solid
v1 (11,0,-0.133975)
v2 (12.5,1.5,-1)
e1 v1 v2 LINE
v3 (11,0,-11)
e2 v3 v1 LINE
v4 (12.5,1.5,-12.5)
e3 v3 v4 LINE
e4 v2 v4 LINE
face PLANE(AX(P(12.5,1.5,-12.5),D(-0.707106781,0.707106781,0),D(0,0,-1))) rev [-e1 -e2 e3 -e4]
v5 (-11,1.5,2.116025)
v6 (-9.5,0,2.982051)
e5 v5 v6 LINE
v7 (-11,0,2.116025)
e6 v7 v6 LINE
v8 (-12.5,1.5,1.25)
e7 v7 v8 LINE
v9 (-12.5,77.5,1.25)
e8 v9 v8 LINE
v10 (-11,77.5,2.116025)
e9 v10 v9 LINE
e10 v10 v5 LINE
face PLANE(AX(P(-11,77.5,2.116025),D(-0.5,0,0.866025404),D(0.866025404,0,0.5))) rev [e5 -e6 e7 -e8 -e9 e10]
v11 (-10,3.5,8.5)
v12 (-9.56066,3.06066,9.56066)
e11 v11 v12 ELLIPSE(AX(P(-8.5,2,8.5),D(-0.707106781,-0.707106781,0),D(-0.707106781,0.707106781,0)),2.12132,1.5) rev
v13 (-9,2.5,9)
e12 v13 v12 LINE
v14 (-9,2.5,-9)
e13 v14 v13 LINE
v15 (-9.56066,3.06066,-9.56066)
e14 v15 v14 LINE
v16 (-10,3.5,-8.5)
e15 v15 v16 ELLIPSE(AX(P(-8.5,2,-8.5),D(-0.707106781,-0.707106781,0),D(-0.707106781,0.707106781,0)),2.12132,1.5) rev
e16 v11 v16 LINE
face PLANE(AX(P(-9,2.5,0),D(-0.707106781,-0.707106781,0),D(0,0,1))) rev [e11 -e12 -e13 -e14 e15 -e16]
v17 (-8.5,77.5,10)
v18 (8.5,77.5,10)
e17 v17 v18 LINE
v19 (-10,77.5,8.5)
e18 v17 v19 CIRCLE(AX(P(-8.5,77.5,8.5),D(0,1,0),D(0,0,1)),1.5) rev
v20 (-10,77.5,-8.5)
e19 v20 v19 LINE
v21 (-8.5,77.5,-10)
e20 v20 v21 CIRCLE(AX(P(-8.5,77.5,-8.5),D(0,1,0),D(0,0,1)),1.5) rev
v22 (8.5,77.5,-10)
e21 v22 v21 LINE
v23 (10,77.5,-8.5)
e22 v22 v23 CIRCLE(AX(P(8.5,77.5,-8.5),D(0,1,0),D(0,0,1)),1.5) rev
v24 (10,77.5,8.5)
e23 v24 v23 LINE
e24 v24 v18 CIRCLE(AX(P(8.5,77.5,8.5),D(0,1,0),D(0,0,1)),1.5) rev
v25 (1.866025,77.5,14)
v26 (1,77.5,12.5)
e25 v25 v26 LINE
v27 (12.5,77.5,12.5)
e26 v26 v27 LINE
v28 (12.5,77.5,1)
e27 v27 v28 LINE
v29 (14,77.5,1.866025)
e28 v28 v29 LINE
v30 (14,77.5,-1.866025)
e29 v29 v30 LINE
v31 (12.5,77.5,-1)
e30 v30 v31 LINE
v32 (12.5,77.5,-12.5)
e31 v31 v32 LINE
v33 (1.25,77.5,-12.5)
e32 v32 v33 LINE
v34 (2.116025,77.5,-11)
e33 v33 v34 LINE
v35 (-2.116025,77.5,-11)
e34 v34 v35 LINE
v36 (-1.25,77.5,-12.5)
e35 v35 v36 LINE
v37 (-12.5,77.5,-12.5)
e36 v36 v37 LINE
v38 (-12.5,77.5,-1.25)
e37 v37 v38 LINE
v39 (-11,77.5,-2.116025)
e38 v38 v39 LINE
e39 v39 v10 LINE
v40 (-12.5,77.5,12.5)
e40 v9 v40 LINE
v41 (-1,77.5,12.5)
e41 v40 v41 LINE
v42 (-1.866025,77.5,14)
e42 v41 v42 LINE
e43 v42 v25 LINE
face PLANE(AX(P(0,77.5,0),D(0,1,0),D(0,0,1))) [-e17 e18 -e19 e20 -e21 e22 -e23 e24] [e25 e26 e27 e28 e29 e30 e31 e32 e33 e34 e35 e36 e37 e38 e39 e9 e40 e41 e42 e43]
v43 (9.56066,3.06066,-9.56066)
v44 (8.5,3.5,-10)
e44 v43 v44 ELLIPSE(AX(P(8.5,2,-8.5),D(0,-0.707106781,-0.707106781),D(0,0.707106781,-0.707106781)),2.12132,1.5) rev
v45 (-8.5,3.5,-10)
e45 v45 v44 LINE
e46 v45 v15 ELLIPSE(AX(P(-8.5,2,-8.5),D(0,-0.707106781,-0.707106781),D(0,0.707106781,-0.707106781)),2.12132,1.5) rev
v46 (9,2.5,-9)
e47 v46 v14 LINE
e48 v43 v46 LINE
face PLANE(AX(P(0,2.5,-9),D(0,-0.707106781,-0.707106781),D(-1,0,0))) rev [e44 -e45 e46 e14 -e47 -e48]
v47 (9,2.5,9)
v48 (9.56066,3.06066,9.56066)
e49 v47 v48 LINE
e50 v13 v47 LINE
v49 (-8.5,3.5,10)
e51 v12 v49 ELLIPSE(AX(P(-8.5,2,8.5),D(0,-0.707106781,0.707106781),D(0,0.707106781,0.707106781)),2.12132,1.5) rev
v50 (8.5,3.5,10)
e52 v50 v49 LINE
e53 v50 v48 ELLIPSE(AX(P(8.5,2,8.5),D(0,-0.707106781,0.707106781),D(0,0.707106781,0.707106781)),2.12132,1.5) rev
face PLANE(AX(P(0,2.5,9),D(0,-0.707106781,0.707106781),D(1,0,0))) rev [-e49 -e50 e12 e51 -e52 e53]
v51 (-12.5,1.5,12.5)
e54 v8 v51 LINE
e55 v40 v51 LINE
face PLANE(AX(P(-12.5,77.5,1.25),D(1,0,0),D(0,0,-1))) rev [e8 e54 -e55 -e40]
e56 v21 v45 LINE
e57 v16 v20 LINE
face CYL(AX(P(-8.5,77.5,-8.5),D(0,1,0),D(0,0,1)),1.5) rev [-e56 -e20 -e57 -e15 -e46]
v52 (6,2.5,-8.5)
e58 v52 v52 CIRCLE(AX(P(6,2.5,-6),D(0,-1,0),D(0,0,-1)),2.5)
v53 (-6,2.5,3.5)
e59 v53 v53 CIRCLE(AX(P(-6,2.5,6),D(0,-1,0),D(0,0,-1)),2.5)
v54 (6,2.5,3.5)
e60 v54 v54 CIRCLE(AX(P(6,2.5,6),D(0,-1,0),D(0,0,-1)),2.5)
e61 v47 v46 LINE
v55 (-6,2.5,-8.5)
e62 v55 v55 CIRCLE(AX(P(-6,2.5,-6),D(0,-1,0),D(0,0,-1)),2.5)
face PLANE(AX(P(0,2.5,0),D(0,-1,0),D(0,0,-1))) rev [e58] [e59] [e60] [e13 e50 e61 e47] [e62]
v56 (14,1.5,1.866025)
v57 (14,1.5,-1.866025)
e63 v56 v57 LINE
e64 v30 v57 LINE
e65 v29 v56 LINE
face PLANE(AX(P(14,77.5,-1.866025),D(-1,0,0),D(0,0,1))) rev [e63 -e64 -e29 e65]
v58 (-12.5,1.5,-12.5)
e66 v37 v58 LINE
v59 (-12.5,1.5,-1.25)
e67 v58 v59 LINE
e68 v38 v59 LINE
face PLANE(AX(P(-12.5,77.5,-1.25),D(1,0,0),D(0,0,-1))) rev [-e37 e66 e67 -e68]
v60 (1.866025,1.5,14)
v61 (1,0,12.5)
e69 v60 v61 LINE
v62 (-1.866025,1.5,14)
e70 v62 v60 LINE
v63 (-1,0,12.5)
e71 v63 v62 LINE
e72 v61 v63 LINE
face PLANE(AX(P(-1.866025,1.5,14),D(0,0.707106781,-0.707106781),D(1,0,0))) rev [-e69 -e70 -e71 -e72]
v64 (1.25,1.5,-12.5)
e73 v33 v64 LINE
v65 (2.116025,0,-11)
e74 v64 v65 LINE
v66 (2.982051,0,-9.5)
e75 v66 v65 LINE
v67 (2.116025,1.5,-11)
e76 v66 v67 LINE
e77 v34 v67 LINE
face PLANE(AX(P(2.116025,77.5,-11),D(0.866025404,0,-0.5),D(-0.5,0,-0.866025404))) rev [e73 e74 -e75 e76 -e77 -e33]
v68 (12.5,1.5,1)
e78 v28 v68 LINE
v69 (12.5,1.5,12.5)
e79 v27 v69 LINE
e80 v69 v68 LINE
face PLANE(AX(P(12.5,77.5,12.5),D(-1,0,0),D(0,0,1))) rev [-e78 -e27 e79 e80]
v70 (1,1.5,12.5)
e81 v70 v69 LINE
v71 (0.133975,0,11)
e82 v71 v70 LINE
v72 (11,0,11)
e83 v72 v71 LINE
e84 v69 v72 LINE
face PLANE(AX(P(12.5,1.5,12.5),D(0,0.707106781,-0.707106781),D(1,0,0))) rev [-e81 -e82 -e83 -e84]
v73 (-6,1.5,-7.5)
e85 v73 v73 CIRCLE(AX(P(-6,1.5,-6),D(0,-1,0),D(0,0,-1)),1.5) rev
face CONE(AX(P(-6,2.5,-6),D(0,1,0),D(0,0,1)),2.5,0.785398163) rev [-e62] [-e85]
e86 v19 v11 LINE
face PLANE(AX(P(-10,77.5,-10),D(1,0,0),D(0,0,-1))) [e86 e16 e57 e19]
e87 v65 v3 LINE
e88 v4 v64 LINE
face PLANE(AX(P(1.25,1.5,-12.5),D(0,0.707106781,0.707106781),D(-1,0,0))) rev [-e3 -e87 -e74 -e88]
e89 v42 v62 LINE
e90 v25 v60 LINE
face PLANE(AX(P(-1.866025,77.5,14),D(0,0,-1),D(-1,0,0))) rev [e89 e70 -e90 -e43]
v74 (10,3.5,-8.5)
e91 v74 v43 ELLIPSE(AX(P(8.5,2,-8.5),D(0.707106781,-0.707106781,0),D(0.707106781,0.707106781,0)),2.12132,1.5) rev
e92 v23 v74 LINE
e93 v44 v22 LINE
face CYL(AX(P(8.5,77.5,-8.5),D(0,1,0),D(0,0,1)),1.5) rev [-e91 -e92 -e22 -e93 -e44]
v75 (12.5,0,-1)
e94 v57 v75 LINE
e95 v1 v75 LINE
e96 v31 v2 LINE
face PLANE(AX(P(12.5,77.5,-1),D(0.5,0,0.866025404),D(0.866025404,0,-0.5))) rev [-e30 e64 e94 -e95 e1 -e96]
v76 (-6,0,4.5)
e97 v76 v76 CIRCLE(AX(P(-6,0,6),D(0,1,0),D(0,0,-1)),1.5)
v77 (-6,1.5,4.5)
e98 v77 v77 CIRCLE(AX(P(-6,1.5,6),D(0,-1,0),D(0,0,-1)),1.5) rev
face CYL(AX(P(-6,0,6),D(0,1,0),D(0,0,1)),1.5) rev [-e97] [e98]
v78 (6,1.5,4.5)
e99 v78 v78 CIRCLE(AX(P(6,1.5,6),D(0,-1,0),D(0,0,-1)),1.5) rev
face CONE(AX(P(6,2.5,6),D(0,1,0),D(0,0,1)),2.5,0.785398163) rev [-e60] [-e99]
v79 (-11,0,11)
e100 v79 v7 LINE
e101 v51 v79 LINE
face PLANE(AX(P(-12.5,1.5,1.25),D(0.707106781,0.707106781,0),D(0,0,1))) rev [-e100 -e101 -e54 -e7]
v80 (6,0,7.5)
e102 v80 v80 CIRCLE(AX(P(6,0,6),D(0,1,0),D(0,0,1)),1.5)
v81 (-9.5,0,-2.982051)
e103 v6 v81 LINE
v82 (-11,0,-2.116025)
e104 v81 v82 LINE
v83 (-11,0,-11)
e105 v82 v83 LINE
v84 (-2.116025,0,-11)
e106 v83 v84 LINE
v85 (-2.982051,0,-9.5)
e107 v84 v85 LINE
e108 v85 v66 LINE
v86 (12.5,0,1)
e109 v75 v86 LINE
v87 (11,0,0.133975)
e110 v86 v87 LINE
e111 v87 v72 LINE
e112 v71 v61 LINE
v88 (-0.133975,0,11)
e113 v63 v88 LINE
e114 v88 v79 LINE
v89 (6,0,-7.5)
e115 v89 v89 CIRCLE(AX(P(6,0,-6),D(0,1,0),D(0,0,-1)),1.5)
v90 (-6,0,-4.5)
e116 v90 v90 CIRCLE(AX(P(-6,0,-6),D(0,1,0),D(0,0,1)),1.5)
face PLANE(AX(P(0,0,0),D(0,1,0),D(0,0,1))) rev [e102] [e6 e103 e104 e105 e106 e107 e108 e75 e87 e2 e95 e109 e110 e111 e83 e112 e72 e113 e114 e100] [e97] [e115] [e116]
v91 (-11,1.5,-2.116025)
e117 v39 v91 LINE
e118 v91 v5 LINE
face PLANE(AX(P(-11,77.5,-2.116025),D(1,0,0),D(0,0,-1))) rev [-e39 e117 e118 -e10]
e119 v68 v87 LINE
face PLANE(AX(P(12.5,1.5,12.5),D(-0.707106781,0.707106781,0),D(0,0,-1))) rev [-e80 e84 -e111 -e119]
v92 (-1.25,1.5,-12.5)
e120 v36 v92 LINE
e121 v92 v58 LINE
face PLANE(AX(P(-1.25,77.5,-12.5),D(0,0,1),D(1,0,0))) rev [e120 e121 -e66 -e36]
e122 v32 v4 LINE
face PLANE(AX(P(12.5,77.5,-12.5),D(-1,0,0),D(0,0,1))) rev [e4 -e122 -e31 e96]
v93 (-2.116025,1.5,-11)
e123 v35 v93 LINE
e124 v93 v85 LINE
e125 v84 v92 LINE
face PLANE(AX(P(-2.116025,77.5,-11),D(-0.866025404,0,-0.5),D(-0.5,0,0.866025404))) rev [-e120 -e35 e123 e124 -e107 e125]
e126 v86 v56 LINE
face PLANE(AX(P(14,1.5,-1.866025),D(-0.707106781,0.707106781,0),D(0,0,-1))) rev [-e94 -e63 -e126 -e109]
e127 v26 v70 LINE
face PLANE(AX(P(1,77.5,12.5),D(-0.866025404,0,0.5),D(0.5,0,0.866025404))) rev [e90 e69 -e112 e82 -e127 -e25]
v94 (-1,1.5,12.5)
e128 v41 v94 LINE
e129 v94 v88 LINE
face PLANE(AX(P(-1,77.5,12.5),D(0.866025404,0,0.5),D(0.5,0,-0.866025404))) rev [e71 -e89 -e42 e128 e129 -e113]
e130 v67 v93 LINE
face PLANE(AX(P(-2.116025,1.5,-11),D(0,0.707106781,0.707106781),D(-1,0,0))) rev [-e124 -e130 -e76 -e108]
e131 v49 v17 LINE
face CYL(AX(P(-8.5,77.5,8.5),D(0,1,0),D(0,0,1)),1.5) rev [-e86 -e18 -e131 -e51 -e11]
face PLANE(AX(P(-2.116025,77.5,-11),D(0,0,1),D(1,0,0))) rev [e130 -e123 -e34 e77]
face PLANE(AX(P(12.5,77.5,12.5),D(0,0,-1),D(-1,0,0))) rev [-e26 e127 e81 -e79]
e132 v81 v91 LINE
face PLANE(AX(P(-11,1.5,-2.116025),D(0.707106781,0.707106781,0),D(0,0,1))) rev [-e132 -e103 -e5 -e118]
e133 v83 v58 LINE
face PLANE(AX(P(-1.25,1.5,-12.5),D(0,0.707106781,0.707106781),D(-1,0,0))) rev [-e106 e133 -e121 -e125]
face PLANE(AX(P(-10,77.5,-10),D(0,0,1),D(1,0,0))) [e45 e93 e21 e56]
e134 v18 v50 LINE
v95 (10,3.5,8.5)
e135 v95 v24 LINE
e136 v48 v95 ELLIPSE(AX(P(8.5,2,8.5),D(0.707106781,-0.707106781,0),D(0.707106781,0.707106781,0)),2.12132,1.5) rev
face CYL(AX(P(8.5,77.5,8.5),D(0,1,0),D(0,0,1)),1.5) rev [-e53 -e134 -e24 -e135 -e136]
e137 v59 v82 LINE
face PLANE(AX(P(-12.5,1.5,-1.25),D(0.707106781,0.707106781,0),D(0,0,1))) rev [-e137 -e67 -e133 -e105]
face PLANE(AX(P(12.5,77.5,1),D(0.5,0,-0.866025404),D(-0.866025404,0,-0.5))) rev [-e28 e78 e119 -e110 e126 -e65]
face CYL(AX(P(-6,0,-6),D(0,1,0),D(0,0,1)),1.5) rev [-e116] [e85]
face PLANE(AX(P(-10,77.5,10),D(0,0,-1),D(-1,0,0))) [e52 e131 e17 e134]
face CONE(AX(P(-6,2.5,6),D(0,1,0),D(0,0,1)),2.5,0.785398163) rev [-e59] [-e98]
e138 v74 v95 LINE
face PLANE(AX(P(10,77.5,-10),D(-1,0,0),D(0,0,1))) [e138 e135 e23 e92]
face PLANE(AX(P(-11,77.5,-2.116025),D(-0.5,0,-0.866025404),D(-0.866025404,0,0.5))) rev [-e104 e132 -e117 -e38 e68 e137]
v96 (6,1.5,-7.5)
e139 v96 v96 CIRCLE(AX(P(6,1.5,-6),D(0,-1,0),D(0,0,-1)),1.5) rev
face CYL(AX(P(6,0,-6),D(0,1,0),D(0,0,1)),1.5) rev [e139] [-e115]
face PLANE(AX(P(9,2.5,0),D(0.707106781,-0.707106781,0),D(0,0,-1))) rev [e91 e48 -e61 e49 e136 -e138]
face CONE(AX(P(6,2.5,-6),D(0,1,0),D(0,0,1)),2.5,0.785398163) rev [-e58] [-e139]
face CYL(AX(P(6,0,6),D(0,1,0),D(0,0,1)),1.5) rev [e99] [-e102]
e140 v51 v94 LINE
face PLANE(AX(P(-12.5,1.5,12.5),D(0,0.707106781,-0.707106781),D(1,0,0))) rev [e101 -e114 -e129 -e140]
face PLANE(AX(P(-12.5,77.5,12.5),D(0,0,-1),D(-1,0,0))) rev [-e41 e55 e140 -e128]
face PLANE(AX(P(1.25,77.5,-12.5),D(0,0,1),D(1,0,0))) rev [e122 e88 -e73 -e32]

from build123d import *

# Parameters (mm, degrees)
SKETCH1_W               = 20
SKETCH1_H               = 20
BOSS_EXTRUDE1_DEPTH     = 77.5
SKETCH2_W               = 20
SKETCH2_H               = 20
BOSS_EXTRUDE2_DEPTH     = 2.5
CUT_EXTRUDE1_DEPTH      = 78.569323834
CUT_EXTRUDE1_DEPTH_BACK = 78.569323834
SKETCH3_R               = 1.5
CHAMFER1_SIZE           = 1.5
CHAMFER2_SIZE           = 1
FILLET1_R               = 1.5


with BuildPart() as part:
    # Sketch1 → Boss-Extrude1 (new body)
    with BuildSketch(Plane(origin=(0, 0, 0), x_dir=(1, 0, 0), z_dir=(0, 1, 0))):
        Polygon((-11, 2.116025404), (-11, -2.116025404), (-12.5, -1.25), (-12.5, -12.5), (-1, -12.5), (-1.866025404, -14), (1.866025404, -14), (1, -12.5), (12.5, -12.5), (12.5, -1), (14, -1.866025404), (14, 1.866025404), (12.5, 1), (12.5, 12.5), (1.25, 12.5), (2.116025404, 11), (-2.116025404, 11), (-1.25, 12.5), (-12.5, 12.5), (-12.5, 1.25), align=None)
        Rectangle(SKETCH1_W, SKETCH1_H, mode=Mode.SUBTRACT)
    extrude(amount=BOSS_EXTRUDE1_DEPTH)

    # Sketch2 → Boss-Extrude2 (add)
    with BuildSketch(Plane(origin=(0, 0, 0), x_dir=(1, 0, 0), z_dir=(0, 1, 0))):
        Rectangle(SKETCH2_W, SKETCH2_H)
    extrude(amount=BOSS_EXTRUDE2_DEPTH)

    # Sketch3 → Cut-Extrude1 (cut, two sides: drawn at the far end of the back side and taken through both)
    with BuildSketch(Plane(origin=(0, 2.5, 0), x_dir=(1, 0, 0), z_dir=(0, 1, 0)).offset(-CUT_EXTRUDE1_DEPTH_BACK)):
        with Locations(Location((-6, 6, 0), (0, 0, 270))):
            Circle(SKETCH3_R)
        with Locations(Location((6, 6, 0), (0, 0, 90))):
            Circle(SKETCH3_R)
        with Locations(Location((6, -6, 0), (0, 0, 270))):
            Circle(SKETCH3_R)
        with Locations(Location((-6, -6, 0), (0, 0, 90))):
            Circle(SKETCH3_R)
    extrude(amount=CUT_EXTRUDE1_DEPTH + CUT_EXTRUDE1_DEPTH_BACK, mode=Mode.SUBTRACT)

    # Chamfer1
    chamfer1_edges = [part.edges().sort_by_distance(p)[0] for p in [
        (14, 0, 0),
        (12.5, 0, -6.75),
        (6.875, 0, -12.5),
        (0, 0, -11),
        (0, 0, 14),
        (12.5, 0, 6.75),
        (6.75, 0, 12.5),
        (-11, 0, 0),
        (-6.75, 0, 12.5),
        (-12.5, 0, 6.875),
        (-6.875, 0, -12.5),
        (-12.5, 0, -6.875),
    ]]
    chamfer(chamfer1_edges, length=CHAMFER1_SIZE - 0.0001)  # a hair under: the kernel refuses the full size

    # Chamfer2
    chamfer2_edges = [part.edges().sort_by_distance(p)[0] for p in [
        (0, 2.5, -10),
        (-10, 2.5, 0),
        (0, 2.5, 10),
        (10, 2.5, 0),
        (-6, 2.5, 7.5),
        (6, 2.5, 4.5),
        (6, 2.5, -4.5),
        (-6, 2.5, -7.5),
    ]]
    chamfer(chamfer2_edges, length=CHAMFER2_SIZE)

    # Fillet1
    fillet1_edges = [part.edges().sort_by_distance(p)[0] for p in [
        (10, 40.5, -10),
        (-10, 40.5, -10),
        (-10, 40.5, 10),
        (10, 40.5, 10),
    ]]
    fillet(fillet1_edges, radius=FILLET1_R)


solid = part.part
